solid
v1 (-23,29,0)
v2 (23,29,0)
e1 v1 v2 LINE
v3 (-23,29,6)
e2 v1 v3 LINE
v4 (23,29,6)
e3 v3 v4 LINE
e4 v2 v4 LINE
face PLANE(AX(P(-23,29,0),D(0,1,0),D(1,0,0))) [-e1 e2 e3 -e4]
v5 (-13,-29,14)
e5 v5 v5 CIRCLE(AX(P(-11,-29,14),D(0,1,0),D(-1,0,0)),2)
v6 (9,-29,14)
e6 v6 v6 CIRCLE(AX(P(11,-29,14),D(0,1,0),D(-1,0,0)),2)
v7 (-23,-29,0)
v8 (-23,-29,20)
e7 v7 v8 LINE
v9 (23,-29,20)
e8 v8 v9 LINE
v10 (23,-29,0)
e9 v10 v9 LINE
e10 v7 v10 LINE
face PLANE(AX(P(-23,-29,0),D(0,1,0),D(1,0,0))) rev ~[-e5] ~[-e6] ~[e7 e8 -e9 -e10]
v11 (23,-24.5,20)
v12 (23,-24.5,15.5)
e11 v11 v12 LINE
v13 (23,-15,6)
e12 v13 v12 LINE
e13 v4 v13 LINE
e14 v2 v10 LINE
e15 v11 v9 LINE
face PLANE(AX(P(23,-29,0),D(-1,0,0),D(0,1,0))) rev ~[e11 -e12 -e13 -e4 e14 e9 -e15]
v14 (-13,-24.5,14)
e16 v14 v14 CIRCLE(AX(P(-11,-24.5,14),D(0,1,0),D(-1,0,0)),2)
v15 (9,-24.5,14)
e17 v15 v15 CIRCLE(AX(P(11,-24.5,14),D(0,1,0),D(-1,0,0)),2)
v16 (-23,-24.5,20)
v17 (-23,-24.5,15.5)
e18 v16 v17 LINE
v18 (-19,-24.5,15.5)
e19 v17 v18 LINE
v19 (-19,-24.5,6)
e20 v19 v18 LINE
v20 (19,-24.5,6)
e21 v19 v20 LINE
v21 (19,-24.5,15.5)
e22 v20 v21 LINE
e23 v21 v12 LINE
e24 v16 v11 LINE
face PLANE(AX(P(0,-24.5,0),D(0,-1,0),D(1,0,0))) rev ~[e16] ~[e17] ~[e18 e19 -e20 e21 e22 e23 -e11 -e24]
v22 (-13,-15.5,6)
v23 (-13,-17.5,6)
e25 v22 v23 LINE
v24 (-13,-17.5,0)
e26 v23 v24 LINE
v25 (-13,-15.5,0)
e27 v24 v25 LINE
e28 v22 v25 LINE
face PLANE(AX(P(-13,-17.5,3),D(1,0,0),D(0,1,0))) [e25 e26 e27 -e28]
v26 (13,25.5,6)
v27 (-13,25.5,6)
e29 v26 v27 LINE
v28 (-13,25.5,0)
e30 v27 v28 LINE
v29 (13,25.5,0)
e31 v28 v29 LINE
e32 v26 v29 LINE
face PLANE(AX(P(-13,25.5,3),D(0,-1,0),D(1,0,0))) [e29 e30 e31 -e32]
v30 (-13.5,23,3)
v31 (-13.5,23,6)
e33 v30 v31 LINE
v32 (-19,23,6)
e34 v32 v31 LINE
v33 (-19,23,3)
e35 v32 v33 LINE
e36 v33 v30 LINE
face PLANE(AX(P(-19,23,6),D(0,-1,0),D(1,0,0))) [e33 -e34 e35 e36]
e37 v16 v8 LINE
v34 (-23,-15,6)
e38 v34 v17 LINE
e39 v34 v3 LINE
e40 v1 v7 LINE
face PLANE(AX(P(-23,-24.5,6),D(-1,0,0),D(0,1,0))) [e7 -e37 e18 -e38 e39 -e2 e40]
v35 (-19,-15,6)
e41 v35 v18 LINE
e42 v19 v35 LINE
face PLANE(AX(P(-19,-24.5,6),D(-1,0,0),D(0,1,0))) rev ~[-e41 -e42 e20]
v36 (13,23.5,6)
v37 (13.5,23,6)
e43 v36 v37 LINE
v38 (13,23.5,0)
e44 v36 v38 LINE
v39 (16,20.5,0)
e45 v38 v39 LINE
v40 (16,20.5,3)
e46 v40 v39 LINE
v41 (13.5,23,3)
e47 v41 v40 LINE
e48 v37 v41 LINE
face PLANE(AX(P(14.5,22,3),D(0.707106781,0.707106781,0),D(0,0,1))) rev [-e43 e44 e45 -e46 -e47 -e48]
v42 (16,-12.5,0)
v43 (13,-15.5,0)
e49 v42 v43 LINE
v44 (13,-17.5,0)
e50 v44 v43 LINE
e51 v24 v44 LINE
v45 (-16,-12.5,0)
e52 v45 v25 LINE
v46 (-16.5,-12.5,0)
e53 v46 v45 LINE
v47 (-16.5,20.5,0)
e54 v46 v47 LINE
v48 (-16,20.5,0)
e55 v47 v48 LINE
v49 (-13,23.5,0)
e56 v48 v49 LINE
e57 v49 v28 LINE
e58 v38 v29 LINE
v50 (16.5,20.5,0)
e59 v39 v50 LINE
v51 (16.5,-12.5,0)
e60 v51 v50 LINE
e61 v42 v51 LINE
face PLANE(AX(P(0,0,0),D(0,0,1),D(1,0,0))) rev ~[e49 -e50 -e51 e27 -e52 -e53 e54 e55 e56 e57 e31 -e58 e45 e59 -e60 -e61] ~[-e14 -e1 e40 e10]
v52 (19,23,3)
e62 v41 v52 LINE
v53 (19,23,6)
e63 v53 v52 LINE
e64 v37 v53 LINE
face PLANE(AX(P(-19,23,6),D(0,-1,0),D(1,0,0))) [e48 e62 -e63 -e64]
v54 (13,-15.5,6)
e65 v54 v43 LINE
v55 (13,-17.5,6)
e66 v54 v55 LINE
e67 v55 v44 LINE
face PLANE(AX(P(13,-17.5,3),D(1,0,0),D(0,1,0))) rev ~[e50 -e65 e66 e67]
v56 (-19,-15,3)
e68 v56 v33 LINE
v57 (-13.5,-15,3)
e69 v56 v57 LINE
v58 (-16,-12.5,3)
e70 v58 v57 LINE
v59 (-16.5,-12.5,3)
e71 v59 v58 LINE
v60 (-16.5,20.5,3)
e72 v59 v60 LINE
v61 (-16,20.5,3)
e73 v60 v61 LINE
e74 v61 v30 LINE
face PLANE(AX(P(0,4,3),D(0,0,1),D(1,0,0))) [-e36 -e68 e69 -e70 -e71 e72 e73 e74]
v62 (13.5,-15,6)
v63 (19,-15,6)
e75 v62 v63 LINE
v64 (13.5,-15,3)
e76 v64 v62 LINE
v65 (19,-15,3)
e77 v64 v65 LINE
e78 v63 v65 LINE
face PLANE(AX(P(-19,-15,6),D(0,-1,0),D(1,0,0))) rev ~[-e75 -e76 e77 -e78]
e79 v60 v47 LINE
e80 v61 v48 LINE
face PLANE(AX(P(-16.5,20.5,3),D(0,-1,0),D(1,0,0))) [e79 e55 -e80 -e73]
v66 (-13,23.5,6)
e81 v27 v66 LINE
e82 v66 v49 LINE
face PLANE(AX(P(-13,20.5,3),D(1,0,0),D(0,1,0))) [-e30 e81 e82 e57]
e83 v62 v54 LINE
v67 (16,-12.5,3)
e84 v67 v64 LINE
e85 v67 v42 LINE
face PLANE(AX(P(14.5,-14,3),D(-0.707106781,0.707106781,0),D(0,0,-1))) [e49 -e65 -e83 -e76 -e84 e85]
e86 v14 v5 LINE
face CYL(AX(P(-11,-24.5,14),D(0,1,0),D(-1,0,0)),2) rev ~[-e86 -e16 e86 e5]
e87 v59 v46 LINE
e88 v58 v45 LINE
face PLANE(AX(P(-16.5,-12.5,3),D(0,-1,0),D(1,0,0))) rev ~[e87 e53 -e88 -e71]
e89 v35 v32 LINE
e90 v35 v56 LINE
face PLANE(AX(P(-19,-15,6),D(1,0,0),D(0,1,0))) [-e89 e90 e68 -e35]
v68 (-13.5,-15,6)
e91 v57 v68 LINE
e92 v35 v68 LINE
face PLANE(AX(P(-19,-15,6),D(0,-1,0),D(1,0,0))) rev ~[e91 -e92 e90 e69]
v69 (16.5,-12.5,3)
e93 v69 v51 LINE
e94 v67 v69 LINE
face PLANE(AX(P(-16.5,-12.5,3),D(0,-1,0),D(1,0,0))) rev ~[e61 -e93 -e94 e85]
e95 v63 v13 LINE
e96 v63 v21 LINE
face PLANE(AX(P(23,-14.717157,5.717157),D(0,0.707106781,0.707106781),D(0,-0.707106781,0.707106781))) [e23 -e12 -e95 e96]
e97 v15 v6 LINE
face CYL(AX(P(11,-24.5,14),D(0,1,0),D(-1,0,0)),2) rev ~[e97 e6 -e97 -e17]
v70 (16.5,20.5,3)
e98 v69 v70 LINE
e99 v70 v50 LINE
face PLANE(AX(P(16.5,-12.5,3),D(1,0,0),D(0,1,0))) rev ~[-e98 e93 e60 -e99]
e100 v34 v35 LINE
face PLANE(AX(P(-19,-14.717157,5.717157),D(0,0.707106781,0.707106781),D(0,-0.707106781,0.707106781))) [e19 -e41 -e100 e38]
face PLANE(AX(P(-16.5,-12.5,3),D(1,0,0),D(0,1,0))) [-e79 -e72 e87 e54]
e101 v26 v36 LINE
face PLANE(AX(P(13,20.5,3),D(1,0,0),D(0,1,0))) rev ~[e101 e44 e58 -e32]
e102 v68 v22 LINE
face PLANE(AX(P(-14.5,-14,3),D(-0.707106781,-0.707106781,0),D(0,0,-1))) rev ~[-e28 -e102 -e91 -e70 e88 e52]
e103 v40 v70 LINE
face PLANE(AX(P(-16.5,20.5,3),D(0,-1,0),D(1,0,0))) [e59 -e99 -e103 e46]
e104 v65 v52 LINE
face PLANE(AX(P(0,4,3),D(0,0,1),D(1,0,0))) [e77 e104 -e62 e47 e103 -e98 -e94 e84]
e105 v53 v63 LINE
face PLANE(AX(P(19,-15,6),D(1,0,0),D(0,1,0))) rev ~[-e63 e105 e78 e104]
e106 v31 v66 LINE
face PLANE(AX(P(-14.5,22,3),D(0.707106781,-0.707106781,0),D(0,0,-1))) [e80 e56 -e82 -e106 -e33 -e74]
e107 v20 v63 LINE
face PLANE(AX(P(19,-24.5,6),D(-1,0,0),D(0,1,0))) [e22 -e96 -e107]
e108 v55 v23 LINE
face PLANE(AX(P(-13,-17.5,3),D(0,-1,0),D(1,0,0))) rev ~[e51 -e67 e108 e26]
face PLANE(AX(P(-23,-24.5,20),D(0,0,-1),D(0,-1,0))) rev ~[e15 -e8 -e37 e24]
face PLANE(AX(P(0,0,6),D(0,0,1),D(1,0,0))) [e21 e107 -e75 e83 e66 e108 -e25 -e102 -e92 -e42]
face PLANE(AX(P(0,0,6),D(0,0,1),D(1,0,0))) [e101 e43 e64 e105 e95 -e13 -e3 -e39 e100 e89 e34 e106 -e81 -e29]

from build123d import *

# Parameters (mm, degrees)
F0_W          = 46
F0_H          = 58
F1_DEPTH      = 6
F2_W          = 38
F2_H          = 38
F3_DEPTH      = 3
F4_W          = 33
F4_H          = 33
F5_DEPTH      = 3.001
F6_W          = 26
F6_H          = 5
F7_DEPTH      = 3.001
F7_DEPTH_BACK = 3.001
F8_W          = 26
F8_H          = 5
F9_DEPTH      = 3.001
F9_DEPTH_BACK = 3.001
F10_SIZE      = 3
F11_W         = 4.5
F11_H         = 20
F12_DEPTH     = 46
F13_W         = 4
F13_H         = 9.5
F14_DEPTH     = 10
F15_T4_DEPTH  = 4
F16_W         = 4
F16_H         = 9.5
F17_DEPTH     = 10
F18_T4_DEPTH  = 4
F19_R         = 2
F20_DEPTH     = 4.501


# Not quite as in the source:
# - a fillet or chamfer that OpenCascade refuses, or shapes differently, is made with other operations: its cross-section is extruded or revolved along the edge and cut away or added


with BuildPart() as f1:
    # F0 (on Top) → F1 (new body)
    with BuildSketch(Plane.XY):
        Rectangle(F0_W, F0_H)
    extrude(amount=F1_DEPTH)

    # F2 (on face) → F3 (cut)
    with BuildSketch(Plane.XY.offset(6)):
        with Locations((0, 4)):
            Rectangle(F2_W, F2_H)
    extrude(amount=-F3_DEPTH, mode=Mode.SUBTRACT)

    # F4 (on face) → F5 (cut, through all)
    with BuildSketch(Plane.XY.offset(3)):
        with Locations((0, 4)):
            Rectangle(F4_W, F4_H)
    extrude(amount=-F5_DEPTH, mode=Mode.SUBTRACT)

    # F6 (on face) → F7 (cut, two sides)
    with BuildSketch(Plane.XY.offset(3)) as f7_sk:
        with Locations((0, 23)):
            Rectangle(F6_W, F6_H)
    extrude(amount=-F7_DEPTH, mode=Mode.SUBTRACT)
    extrude(f7_sk.sketch, amount=F7_DEPTH_BACK, mode=Mode.SUBTRACT)

    # F8 (on face) → F9 (cut, two sides)
    with BuildSketch(Plane.XY.offset(3)) as f9_sk:
        with Locations((0, -15)):
            Rectangle(F8_W, F8_H)
    extrude(amount=F9_DEPTH, mode=Mode.SUBTRACT)
    extrude(f9_sk.sketch, amount=-F9_DEPTH_BACK, mode=Mode.SUBTRACT)

    # F10
    f10_edges = [f1.edges().sort_by_distance(p)[0] for p in [
        (-13, -12.5, 1.5),
        (-13, 20.5, 1.5),
        (13, 20.5, 1.5),
        (13, -12.5, 1.5),
    ]]
    chamfer(f10_edges, length=F10_SIZE)

    # F11 (on face) → F12 (join)
    with BuildSketch(Plane(origin=(-23, 0, 0), x_dir=(0, -1, 0), z_dir=(-1, 0, 0))):
        with Locations((26.75, 10)):
            Rectangle(F11_W, F11_H)
    extrude(amount=-F12_DEPTH)

    # F13 (on face) → F14 (join)
    with BuildSketch(Plane.XY.offset(6)):
        with Locations((-21, -19.75)):
            Rectangle(F13_W, F13_H)
    extrude(amount=F14_DEPTH)

    # F15: chamfer of 10 on 1 edges, made by hand


with BuildPart() as f15_tool2:
    # F15_s3 → F15_t4 (new body)
    with BuildSketch(Plane.YZ.offset(-19)):
        with BuildLine():
            Line((-14.7171572875, 5.7171572875), (-25.2828427125, 16.2828427125))
            Line((-25.2828427125, 16.2828427125), (-25.2828427125, 16.4828427125))
            ThreePointArc((-25.2828427125, 16.4828427125), (-20.1414213562, 16.2), (-15, 16.2))
            Line((-15, 16.2), (-14.8, 16))
            ThreePointArc((-14.8, 16), (-14.8, 10.8585786438), (-14.5171572875, 5.7171572875))
            Line((-14.5171572875, 5.7171572875), (-14.7171572875, 5.7171572875))
        make_face()
    extrude(amount=-F15_T4_DEPTH)

    split(bisect_by=Plane.XY.offset(6), keep=Keep.TOP)

    split(bisect_by=Plane.XZ.offset(24.5), keep=Keep.BOTTOM)


with BuildPart() as f1_1:
    add(f1.part)

    # F15_t1: cut F15_tool2
    add(f15_tool2.part, mode=Mode.SUBTRACT)

    # F16 (on face) → F17 (join)
    with BuildSketch(Plane.XY.offset(6)):
        with Locations((21, -19.75)):
            Rectangle(F16_W, F16_H)
    extrude(amount=F17_DEPTH)

    # F18: chamfer of 10 on 1 edges, made by hand


with BuildPart() as f18_tool2:
    # F18_s3 → F18_t4 (new body)
    with BuildSketch(Plane.YZ.offset(23)):
        with BuildLine():
            Line((-14.7171572875, 5.7171572875), (-25.2828427125, 16.2828427125))
            Line((-25.2828427125, 16.2828427125), (-25.2828427125, 16.4828427125))
            ThreePointArc((-25.2828427125, 16.4828427125), (-20.1414213562, 16.2), (-15, 16.2))
            Line((-15, 16.2), (-14.8, 16))
            ThreePointArc((-14.8, 16), (-14.8, 10.8585786438), (-14.5171572875, 5.7171572875))
            Line((-14.5171572875, 5.7171572875), (-14.7171572875, 5.7171572875))
        make_face()
    extrude(amount=-F18_T4_DEPTH)

    split(bisect_by=Plane.XY.offset(6), keep=Keep.TOP)

    split(bisect_by=Plane.XZ.offset(24.5), keep=Keep.BOTTOM)


with BuildPart() as f1_2:
    add(f1_1.part)

    # F18_t1: cut F18_tool2
    add(f18_tool2.part, mode=Mode.SUBTRACT)

    # F19 (on face) → F20 (cut, through all)
    with BuildSketch(Plane(origin=(0, -24.5, 0), x_dir=(-1, 0, 0), z_dir=(0, 1, 0))):
        with Locations((11, 14)):
            Circle(F19_R)
        with Locations((-11, 14)):
            Circle(F19_R)
    extrude(amount=-F20_DEPTH, mode=Mode.SUBTRACT)


solid = f1_2.part
